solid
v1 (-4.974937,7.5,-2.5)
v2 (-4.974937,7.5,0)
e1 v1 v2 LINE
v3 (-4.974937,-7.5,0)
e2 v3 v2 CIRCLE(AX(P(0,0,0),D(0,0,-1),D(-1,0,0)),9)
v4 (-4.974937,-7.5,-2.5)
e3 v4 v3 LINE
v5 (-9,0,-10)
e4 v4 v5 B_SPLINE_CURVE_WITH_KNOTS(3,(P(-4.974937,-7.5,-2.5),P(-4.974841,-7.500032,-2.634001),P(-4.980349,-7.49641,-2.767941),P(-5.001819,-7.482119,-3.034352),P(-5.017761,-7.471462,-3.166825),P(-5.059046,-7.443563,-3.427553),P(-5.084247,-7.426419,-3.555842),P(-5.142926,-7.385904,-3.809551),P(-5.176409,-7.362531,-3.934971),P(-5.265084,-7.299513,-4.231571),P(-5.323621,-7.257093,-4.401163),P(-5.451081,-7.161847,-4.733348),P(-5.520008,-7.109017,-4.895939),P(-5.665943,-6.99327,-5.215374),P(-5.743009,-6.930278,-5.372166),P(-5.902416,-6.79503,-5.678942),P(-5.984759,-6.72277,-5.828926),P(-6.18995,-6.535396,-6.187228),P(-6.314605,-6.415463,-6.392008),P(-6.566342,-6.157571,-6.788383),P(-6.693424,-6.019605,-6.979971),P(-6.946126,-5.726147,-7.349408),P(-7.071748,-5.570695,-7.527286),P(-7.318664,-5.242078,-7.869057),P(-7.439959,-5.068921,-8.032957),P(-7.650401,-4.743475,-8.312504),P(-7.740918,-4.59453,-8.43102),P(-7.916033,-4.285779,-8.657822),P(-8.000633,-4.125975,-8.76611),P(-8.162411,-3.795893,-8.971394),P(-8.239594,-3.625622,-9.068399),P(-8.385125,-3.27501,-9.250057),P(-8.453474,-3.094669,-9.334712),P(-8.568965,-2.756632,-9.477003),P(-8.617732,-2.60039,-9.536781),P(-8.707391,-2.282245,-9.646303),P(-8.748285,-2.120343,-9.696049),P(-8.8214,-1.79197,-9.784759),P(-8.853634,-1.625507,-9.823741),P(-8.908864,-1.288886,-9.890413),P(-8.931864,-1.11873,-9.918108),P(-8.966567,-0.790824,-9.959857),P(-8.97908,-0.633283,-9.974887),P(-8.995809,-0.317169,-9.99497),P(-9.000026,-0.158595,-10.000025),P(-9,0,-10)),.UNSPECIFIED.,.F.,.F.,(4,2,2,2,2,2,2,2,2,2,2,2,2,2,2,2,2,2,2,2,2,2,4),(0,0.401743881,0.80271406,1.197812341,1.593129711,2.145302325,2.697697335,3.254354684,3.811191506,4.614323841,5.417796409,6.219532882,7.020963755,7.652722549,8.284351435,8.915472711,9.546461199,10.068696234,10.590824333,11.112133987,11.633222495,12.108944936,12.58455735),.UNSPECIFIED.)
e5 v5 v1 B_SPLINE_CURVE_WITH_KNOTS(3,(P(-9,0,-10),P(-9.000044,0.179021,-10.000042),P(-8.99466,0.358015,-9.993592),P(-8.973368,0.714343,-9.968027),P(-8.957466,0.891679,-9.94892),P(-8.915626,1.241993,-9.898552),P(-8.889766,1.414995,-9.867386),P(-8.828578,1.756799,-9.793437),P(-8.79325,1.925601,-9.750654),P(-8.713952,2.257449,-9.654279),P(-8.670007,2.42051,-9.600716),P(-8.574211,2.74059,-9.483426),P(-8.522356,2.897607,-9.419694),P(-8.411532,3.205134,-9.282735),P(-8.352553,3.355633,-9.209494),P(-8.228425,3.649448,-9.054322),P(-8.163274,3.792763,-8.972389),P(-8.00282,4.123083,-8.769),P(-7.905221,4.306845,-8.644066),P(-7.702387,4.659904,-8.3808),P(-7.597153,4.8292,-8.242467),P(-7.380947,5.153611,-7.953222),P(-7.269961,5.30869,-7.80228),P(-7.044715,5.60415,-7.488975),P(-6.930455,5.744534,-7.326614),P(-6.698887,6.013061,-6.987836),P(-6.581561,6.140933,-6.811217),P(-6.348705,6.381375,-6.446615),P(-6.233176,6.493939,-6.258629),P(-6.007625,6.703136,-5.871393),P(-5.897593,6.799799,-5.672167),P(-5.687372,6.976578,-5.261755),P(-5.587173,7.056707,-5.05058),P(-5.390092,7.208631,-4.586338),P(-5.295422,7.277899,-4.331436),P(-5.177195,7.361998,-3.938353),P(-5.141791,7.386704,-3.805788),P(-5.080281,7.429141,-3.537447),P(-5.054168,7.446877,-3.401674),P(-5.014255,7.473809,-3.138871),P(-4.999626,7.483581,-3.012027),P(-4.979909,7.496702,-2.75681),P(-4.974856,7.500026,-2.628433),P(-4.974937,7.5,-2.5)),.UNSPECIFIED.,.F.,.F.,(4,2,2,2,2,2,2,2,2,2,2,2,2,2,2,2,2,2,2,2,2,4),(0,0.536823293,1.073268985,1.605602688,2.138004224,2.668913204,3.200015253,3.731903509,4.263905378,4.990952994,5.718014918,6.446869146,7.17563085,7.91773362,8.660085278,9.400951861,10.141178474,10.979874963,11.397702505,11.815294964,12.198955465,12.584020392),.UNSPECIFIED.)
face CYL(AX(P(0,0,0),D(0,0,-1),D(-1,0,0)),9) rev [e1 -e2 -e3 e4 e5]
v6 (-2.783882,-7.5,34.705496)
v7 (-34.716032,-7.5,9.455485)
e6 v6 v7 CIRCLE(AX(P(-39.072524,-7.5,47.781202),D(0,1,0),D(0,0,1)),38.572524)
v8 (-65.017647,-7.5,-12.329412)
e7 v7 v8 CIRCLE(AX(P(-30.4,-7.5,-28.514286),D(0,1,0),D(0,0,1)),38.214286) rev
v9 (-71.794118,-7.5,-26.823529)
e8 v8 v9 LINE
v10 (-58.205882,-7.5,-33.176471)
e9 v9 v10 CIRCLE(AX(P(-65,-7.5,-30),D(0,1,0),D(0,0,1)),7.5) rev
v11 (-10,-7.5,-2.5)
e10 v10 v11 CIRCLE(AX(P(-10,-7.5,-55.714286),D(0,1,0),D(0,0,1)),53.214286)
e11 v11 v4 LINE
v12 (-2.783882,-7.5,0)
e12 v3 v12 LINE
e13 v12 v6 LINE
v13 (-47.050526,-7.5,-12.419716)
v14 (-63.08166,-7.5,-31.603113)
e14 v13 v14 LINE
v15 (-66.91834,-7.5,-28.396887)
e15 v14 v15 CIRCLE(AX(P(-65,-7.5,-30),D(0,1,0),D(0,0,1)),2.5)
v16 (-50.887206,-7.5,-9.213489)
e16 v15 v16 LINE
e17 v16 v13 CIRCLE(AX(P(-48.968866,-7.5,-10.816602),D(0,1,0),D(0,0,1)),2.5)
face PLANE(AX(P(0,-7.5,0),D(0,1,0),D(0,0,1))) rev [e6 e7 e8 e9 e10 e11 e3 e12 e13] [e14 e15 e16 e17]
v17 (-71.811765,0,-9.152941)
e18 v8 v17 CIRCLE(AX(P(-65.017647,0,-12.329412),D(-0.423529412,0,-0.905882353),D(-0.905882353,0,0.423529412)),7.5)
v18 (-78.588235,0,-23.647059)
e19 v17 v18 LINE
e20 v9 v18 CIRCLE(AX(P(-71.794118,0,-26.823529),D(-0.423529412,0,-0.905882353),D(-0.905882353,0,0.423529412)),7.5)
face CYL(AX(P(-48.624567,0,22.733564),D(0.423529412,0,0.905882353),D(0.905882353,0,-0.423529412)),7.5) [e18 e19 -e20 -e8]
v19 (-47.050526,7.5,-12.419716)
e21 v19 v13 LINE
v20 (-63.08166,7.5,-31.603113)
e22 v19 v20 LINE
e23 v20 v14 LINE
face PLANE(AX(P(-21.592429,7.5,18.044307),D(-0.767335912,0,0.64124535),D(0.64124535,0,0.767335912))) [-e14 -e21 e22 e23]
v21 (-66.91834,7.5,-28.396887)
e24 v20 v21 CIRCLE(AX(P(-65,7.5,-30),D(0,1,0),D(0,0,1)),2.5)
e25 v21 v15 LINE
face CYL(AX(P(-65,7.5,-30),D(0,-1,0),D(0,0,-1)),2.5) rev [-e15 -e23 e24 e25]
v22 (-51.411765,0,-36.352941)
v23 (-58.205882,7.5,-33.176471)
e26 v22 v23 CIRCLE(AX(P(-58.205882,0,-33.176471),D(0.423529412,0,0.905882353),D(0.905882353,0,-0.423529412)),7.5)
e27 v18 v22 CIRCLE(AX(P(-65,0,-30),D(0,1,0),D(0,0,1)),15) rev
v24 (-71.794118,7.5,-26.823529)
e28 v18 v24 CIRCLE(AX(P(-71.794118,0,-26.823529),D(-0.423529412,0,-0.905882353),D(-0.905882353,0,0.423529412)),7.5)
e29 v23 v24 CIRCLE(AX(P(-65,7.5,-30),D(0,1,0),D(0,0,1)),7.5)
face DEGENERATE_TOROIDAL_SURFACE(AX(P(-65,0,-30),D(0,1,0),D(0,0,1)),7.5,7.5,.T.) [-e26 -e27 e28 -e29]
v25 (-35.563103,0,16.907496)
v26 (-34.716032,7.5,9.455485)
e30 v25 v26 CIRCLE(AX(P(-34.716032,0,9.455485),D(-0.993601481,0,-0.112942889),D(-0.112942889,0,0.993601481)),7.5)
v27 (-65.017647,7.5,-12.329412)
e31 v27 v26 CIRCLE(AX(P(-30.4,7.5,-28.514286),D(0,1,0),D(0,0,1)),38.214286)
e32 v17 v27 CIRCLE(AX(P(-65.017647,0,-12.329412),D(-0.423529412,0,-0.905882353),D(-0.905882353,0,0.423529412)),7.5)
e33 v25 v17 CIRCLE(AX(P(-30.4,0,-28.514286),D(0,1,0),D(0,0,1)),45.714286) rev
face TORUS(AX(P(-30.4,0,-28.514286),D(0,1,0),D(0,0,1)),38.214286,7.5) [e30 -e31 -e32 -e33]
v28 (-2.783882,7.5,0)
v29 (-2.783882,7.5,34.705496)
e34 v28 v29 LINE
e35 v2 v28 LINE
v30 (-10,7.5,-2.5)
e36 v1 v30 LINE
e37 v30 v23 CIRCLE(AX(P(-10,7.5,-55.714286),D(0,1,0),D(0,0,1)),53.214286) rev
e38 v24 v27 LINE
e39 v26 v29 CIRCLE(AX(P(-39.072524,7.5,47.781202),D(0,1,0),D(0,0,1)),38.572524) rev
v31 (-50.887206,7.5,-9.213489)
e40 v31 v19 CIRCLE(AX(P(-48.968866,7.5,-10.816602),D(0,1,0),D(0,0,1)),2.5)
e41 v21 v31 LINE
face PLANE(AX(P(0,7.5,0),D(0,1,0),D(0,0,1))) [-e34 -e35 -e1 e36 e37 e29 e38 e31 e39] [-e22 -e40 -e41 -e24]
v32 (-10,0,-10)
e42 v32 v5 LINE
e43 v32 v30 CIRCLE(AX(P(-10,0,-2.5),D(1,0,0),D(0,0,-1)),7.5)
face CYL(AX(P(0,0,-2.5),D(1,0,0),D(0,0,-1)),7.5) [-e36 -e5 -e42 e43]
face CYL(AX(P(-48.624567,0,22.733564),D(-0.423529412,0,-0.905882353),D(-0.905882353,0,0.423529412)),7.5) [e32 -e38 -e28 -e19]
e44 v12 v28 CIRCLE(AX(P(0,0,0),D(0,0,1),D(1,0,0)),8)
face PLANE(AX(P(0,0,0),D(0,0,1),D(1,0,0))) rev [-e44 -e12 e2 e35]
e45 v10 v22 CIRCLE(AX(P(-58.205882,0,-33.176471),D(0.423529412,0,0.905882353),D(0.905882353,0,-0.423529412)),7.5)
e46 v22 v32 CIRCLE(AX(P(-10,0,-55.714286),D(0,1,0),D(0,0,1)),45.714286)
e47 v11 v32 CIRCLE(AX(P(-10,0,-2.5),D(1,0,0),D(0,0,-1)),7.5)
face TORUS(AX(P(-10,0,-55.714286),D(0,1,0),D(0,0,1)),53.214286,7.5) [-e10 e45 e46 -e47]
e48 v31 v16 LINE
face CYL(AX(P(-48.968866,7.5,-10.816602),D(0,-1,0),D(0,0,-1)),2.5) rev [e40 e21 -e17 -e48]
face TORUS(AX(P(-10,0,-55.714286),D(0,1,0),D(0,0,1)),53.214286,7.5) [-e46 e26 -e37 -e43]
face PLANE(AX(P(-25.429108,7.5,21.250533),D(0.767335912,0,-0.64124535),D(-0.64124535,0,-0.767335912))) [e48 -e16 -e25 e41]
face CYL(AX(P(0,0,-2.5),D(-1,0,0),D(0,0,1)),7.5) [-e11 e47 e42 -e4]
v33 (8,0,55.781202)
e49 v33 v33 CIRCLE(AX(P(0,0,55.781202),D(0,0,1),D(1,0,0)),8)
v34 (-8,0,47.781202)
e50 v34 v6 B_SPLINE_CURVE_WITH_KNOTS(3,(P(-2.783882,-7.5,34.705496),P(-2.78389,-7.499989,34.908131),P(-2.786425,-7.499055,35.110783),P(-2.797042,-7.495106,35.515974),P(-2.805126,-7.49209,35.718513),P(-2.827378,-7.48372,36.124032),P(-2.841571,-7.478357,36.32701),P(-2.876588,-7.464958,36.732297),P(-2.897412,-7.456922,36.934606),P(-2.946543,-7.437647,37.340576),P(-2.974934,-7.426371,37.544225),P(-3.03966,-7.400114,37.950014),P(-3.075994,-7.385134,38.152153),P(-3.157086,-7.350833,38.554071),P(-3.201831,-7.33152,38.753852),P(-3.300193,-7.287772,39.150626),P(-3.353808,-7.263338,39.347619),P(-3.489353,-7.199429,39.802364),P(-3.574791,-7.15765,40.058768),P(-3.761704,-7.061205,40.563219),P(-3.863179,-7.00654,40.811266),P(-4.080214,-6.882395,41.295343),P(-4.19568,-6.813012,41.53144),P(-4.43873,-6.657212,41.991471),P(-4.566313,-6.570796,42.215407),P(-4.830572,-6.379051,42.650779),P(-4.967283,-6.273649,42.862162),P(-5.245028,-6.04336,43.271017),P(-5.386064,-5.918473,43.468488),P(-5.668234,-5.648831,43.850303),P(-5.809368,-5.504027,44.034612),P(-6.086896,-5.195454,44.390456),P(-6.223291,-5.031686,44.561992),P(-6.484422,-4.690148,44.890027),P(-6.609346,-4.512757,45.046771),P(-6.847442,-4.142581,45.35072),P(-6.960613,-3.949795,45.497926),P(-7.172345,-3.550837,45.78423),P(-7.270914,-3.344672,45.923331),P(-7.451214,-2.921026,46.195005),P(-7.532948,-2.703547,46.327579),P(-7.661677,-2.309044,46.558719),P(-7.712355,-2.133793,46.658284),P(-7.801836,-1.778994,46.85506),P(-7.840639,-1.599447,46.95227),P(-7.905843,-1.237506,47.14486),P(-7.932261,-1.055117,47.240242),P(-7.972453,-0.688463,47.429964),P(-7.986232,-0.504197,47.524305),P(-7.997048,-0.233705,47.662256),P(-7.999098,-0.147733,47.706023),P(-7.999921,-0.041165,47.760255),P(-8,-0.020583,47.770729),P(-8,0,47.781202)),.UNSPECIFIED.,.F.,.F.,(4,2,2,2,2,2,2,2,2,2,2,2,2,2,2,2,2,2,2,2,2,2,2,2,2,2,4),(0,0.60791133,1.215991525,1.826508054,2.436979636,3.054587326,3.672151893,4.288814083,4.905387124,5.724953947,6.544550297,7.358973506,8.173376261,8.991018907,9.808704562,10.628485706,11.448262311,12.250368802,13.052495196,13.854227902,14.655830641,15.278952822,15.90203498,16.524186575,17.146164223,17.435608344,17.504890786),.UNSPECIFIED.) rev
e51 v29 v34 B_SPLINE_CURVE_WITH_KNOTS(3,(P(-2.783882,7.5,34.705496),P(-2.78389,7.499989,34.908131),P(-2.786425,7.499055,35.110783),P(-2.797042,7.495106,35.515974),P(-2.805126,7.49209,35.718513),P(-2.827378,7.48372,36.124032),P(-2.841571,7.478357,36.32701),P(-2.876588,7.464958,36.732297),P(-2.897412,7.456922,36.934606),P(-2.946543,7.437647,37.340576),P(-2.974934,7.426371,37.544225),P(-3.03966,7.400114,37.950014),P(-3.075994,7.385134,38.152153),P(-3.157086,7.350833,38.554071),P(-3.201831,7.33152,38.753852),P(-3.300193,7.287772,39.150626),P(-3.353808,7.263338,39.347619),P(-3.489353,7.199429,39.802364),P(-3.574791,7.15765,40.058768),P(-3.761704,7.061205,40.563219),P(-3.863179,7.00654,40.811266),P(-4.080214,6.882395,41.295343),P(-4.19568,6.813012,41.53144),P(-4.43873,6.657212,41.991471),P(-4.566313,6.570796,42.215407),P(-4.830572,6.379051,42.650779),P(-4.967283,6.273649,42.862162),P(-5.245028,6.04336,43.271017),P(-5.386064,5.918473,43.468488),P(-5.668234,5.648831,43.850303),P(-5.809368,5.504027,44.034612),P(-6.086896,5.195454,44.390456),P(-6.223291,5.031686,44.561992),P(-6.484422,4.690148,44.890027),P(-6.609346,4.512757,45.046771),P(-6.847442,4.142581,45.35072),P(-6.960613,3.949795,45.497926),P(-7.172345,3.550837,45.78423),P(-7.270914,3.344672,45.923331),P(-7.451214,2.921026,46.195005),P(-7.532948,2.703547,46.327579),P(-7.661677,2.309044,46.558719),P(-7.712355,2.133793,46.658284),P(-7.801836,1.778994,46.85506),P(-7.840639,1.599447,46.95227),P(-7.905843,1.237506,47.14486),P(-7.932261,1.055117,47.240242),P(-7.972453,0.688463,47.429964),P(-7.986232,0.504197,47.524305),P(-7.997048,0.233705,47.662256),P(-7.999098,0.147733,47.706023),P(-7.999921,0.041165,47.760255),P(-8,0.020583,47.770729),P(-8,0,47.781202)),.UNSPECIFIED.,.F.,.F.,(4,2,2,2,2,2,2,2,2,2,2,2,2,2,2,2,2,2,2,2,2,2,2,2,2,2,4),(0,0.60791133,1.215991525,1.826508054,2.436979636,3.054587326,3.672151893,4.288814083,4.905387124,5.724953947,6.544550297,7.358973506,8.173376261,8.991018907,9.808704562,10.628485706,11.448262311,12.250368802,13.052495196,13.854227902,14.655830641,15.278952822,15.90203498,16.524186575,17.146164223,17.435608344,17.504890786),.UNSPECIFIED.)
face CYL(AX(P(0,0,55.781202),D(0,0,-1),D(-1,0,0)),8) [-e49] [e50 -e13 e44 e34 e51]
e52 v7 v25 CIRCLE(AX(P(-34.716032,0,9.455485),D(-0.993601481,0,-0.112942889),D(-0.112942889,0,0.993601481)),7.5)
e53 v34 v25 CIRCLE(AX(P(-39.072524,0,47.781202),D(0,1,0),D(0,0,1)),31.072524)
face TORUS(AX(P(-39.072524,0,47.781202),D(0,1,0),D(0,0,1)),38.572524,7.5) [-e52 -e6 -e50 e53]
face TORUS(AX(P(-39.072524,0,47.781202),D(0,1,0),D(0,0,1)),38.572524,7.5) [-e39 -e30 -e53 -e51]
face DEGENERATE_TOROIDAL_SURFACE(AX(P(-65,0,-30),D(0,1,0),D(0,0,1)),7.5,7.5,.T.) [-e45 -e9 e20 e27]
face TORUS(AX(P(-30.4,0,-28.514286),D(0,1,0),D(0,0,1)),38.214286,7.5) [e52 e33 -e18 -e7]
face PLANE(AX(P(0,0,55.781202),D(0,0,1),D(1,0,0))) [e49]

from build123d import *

# Parameters (mm, degrees)
SKETCH1_R           = 8
BOSS_EXTRUDE1_DEPTH = 55.781202295
BOSS_EXTRUDE2_DEPTH = 7.5
SKETCH4_W           = 9
SKETCH4_H           = 15
FILLET7_R           = 7.5


with BuildPart() as part:
    # Sketch1 → Boss-Extrude1 (new body)
    with BuildSketch(Plane.XY):
        with Locations(Location((0, 0, 0), (0, 0, 180))):
            Circle(SKETCH1_R)
    extrude(amount=BOSS_EXTRUDE1_DEPTH)

    # Sketch2 → Boss-Extrude2 (add, symmetric)
    with BuildSketch(Plane(origin=(0, 0, 0), x_dir=(1, 0, 0), z_dir=(0, 1, 0))):
        with BuildLine():
            Line((0, 0), (0, -47.781202295))
            Line((0, -47.781202295), (-8, -47.781202295))
            ThreePointArc((-8, -47.781202295), (-15.893349065, -27.087541453), (-35.563103488, -16.907496293))
            ThreePointArc((-35.563103488, -16.907496293), (-57.085036764, -8.603159393), (-71.811764706, 9.152941176))
            Line((-71.811764706, 9.152941176), (-78.588235294, 23.647058824))
            ThreePointArc((-78.588235294, 23.647058824), (-71.352941176, 43.588235294), (-51.411764706, 36.352941176))
            ThreePointArc((-51.411764706, 36.352941176), (-34.542879643, 17.146903418), (-10, 10))
            Line((-10, 10), (0, 10))
            Line((0, 10), (0, 0))
        make_face()
        with BuildLine():
            Line((-66.918339779, 28.396886626), (-50.887206037, 9.213488831))
            ThreePointArc((-50.887206037, 9.213488831), (-47.365752883, 8.898262426), (-47.050526478, 12.41971558))
            Line((-47.050526478, 12.41971558), (-63.081660221, 31.603113374))
            ThreePointArc((-63.081660221, 31.603113374), (-66.603113374, 31.918339779), (-66.918339779, 28.396886626))
        make_face(mode=Mode.SUBTRACT)
    extrude(amount=BOSS_EXTRUDE2_DEPTH, both=True)

    # Sketch4 → Cut-Revolve1 (revolve, cut)
    with BuildSketch(Plane(origin=(0, 0, 0), x_dir=(1, 0, 0), z_dir=(0, 1, 0))):
        with Locations((-4.5, -63.281202295)):
            Rectangle(SKETCH4_W, SKETCH4_H)
        with Locations((-4.5, 7.5)):
            Rectangle(SKETCH4_W, SKETCH4_H)
    revolve(axis=Axis((0, 0, 0), (0, 0, 1)), mode=Mode.SUBTRACT)

    # Fillet7
    # the kernel refuses this fillet: 7.5 mm, written as the material it takes off along each edge
    with BuildSketch(Plane(origin=(-10, -7.5, -10), x_dir=(0, 1, 0), z_dir=(1, 0, 0))) as fillet7_piece_1:
        with BuildLine():
            CenterArc((FILLET7_R, FILLET7_R), FILLET7_R, 180, 90)
            Line((0, FILLET7_R), (0, 0))
            Line((0, 0), (FILLET7_R, 0))
        make_face()
    extrude(amount=23.775062814, mode=Mode.SUBTRACT)
    with BuildSketch(Plane(origin=(-10, -7.5, -55.714285714), x_dir=(-0.9058823529411765, 0, 0.423529411764706), z_dir=(-0.423529411764706, 0, -0.9058823529411765))) as fillet7_piece_2:
        with BuildLine():
            CenterArc((45.714285714 + FILLET7_R, FILLET7_R), FILLET7_R, 180, 90)
            Line((45.714285714 + FILLET7_R, 0), (45.714285714, 0))
            Line((45.714285714, 0), (45.714285714, FILLET7_R))
        make_face()
    revolve(axis=Axis((-10, -7.5, -55.714285714), (0, 1, 0)), revolution_arc=64.942384582, mode=Mode.SUBTRACT)
    with BuildSketch(Plane(origin=(-65, -7.5, -30), x_dir=(-0.9058823529411761, 0, 0.42352941176470665), z_dir=(0.42352941176470665, 0, 0.9058823529411761))) as fillet7_piece_3:
        with BuildLine():
            CenterArc((15 - FILLET7_R, -FILLET7_R), FILLET7_R, 0, 90)
            Line((15 - FILLET7_R, 0), (15, 0))
            Line((15, 0), (15, -FILLET7_R))
        make_face()
    revolve(axis=Axis((-65, -7.5, -30), (0, -1, 0)), revolution_arc=180, mode=Mode.SUBTRACT)
    with BuildSketch(Plane(origin=(-71.811764706, -7.5, -9.152941176), x_dir=(0, 1, 0), z_dir=(-0.4235294117647053, 0, -0.9058823529411768))) as fillet7_piece_4:
        with BuildLine():
            CenterArc((FILLET7_R, FILLET7_R), FILLET7_R, 180, 90)
            Line((0, FILLET7_R), (0, 0))
            Line((0, 0), (FILLET7_R, 0))
        make_face()
    extrude(amount=16, mode=Mode.SUBTRACT)
    with BuildSketch(Plane(origin=(-30.4, -7.5, -28.514285714), x_dir=(-0.11294288879485842, 0, 0.9936014814152967), z_dir=(0.9936014814152967, 0, 0.11294288879485842))) as fillet7_piece_5:
        with BuildLine():
            CenterArc((45.714285714 - FILLET7_R, -FILLET7_R), FILLET7_R, 0, 90)
            Line((45.714285714 - FILLET7_R, 0), (45.714285714, 0))
            Line((45.714285714, 0), (45.714285714, -FILLET7_R))
        make_face()
    revolve(axis=Axis((-30.4, -7.5, -28.514285714), (0, -1, 0)), revolution_arc=58.45739638, mode=Mode.SUBTRACT)
    with BuildSketch(Plane(origin=(-10, 7.5, -10), x_dir=(0, -1, 0), z_dir=(1, 0, 0))) as fillet7_piece_6:
        with BuildLine():
            CenterArc((FILLET7_R, -FILLET7_R), FILLET7_R, 90, 90)
            Line((0, -FILLET7_R), (0, 0))
            Line((0, 0), (FILLET7_R, 0))
        make_face()
    extrude(amount=23.775062814, mode=Mode.SUBTRACT)
    with BuildSketch(Plane(origin=(-10, 7.5, -55.714285714), x_dir=(-0.9058823529411765, 0, 0.423529411764706), z_dir=(-0.423529411764706, 0, -0.9058823529411765))) as fillet7_piece_7:
        with BuildLine():
            CenterArc((45.714285714 + FILLET7_R, -FILLET7_R), FILLET7_R, 90, 90)
            Line((45.714285714 + FILLET7_R, 0), (45.714285714, 0))
            Line((45.714285714, 0), (45.714285714, -FILLET7_R))
        make_face()
    revolve(axis=Axis((-10, 7.5, -55.714285714), (0, 1, 0)), revolution_arc=64.942384582, mode=Mode.SUBTRACT)
    with BuildSketch(Plane(origin=(-65, 7.5, -30), x_dir=(-0.9058823529411761, 0, 0.42352941176470665), z_dir=(0.42352941176470665, 0, 0.9058823529411761))) as fillet7_piece_8:
        with BuildLine():
            CenterArc((15 - FILLET7_R, FILLET7_R), FILLET7_R, 270, 90)
            Line((15 - FILLET7_R, 0), (15, 0))
            Line((15, 0), (15, FILLET7_R))
        make_face()
    revolve(axis=Axis((-65, 7.5, -30), (0, -1, 0)), revolution_arc=180, mode=Mode.SUBTRACT)
    with BuildSketch(Plane(origin=(-71.811764706, 7.5, -9.152941176), x_dir=(0, -1, 0), z_dir=(-0.4235294117647053, 0, -0.9058823529411768))) as fillet7_piece_9:
        with BuildLine():
            CenterArc((FILLET7_R, -FILLET7_R), FILLET7_R, 90, 90)
            Line((0, -FILLET7_R), (0, 0))
            Line((0, 0), (FILLET7_R, 0))
        make_face()
    extrude(amount=16, mode=Mode.SUBTRACT)
    with BuildSketch(Plane(origin=(-30.4, 7.5, -28.514285714), x_dir=(-0.11294288879485842, 0, 0.9936014814152967), z_dir=(0.9936014814152967, 0, 0.11294288879485842))) as fillet7_piece_10:
        with BuildLine():
            CenterArc((45.714285714 - FILLET7_R, FILLET7_R), FILLET7_R, 270, 90)
            Line((45.714285714 - FILLET7_R, 0), (45.714285714, 0))
            Line((45.714285714, 0), (45.714285714, FILLET7_R))
        make_face()
    revolve(axis=Axis((-30.4, 7.5, -28.514285714), (0, -1, 0)), revolution_arc=58.45739638, mode=Mode.SUBTRACT)
    with BuildSketch(Plane(origin=(-39.072524125, -7.5, 47.781202295), x_dir=(0.8232772833721975, 0, 0.5676394231228962), z_dir=(-0.5676394231228962, 0, 0.8232772833721975))) as fillet7_piece_11_section:
        with BuildLine():
            CenterArc((31.072524125 + FILLET7_R, FILLET7_R), FILLET7_R, 180, 90)
            Line((31.072524125 + FILLET7_R, 0), (31.072524125, 0))
            Line((31.072524125, 0), (31.072524125, FILLET7_R))
        make_face()
    fillet7_piece_11 = revolve(axis=Axis((-39.072524125, -7.5, 47.781202295), (0, 1, 0)), revolution_arc=118.100790846, mode=Mode.PRIVATE)
    fillet7_piece_11 = fillet7_piece_11 - Plane(origin=(0, 0, 57.650012674), x_dir=(-1, 0, 0), z_dir=(0, 0, -1)) * Cylinder(8, 155, mode=Mode.PRIVATE)
    add(fillet7_piece_11, mode=Mode.SUBTRACT)
    with BuildSketch(Plane(origin=(-39.072524125, 7.5, 47.781202295), x_dir=(0.8232772833721975, 0, 0.5676394231228962), z_dir=(-0.5676394231228962, 0, 0.8232772833721975))) as fillet7_piece_12_section:
        with BuildLine():
            CenterArc((31.072524125 + FILLET7_R, -FILLET7_R), FILLET7_R, 90, 90)
            Line((31.072524125 + FILLET7_R, 0), (31.072524125, 0))
            Line((31.072524125, 0), (31.072524125, -FILLET7_R))
        make_face()
    fillet7_piece_12 = revolve(axis=Axis((-39.072524125, 7.5, 47.781202295), (0, 1, 0)), revolution_arc=118.100790846, mode=Mode.PRIVATE)
    fillet7_piece_12 = fillet7_piece_12 - Plane(origin=(0, 0, 57.650012673), x_dir=(-1, 0, 0), z_dir=(0, 0, -1)) * Cylinder(8, 155, mode=Mode.PRIVATE)
    add(fillet7_piece_12, mode=Mode.SUBTRACT)


solid = part.part
